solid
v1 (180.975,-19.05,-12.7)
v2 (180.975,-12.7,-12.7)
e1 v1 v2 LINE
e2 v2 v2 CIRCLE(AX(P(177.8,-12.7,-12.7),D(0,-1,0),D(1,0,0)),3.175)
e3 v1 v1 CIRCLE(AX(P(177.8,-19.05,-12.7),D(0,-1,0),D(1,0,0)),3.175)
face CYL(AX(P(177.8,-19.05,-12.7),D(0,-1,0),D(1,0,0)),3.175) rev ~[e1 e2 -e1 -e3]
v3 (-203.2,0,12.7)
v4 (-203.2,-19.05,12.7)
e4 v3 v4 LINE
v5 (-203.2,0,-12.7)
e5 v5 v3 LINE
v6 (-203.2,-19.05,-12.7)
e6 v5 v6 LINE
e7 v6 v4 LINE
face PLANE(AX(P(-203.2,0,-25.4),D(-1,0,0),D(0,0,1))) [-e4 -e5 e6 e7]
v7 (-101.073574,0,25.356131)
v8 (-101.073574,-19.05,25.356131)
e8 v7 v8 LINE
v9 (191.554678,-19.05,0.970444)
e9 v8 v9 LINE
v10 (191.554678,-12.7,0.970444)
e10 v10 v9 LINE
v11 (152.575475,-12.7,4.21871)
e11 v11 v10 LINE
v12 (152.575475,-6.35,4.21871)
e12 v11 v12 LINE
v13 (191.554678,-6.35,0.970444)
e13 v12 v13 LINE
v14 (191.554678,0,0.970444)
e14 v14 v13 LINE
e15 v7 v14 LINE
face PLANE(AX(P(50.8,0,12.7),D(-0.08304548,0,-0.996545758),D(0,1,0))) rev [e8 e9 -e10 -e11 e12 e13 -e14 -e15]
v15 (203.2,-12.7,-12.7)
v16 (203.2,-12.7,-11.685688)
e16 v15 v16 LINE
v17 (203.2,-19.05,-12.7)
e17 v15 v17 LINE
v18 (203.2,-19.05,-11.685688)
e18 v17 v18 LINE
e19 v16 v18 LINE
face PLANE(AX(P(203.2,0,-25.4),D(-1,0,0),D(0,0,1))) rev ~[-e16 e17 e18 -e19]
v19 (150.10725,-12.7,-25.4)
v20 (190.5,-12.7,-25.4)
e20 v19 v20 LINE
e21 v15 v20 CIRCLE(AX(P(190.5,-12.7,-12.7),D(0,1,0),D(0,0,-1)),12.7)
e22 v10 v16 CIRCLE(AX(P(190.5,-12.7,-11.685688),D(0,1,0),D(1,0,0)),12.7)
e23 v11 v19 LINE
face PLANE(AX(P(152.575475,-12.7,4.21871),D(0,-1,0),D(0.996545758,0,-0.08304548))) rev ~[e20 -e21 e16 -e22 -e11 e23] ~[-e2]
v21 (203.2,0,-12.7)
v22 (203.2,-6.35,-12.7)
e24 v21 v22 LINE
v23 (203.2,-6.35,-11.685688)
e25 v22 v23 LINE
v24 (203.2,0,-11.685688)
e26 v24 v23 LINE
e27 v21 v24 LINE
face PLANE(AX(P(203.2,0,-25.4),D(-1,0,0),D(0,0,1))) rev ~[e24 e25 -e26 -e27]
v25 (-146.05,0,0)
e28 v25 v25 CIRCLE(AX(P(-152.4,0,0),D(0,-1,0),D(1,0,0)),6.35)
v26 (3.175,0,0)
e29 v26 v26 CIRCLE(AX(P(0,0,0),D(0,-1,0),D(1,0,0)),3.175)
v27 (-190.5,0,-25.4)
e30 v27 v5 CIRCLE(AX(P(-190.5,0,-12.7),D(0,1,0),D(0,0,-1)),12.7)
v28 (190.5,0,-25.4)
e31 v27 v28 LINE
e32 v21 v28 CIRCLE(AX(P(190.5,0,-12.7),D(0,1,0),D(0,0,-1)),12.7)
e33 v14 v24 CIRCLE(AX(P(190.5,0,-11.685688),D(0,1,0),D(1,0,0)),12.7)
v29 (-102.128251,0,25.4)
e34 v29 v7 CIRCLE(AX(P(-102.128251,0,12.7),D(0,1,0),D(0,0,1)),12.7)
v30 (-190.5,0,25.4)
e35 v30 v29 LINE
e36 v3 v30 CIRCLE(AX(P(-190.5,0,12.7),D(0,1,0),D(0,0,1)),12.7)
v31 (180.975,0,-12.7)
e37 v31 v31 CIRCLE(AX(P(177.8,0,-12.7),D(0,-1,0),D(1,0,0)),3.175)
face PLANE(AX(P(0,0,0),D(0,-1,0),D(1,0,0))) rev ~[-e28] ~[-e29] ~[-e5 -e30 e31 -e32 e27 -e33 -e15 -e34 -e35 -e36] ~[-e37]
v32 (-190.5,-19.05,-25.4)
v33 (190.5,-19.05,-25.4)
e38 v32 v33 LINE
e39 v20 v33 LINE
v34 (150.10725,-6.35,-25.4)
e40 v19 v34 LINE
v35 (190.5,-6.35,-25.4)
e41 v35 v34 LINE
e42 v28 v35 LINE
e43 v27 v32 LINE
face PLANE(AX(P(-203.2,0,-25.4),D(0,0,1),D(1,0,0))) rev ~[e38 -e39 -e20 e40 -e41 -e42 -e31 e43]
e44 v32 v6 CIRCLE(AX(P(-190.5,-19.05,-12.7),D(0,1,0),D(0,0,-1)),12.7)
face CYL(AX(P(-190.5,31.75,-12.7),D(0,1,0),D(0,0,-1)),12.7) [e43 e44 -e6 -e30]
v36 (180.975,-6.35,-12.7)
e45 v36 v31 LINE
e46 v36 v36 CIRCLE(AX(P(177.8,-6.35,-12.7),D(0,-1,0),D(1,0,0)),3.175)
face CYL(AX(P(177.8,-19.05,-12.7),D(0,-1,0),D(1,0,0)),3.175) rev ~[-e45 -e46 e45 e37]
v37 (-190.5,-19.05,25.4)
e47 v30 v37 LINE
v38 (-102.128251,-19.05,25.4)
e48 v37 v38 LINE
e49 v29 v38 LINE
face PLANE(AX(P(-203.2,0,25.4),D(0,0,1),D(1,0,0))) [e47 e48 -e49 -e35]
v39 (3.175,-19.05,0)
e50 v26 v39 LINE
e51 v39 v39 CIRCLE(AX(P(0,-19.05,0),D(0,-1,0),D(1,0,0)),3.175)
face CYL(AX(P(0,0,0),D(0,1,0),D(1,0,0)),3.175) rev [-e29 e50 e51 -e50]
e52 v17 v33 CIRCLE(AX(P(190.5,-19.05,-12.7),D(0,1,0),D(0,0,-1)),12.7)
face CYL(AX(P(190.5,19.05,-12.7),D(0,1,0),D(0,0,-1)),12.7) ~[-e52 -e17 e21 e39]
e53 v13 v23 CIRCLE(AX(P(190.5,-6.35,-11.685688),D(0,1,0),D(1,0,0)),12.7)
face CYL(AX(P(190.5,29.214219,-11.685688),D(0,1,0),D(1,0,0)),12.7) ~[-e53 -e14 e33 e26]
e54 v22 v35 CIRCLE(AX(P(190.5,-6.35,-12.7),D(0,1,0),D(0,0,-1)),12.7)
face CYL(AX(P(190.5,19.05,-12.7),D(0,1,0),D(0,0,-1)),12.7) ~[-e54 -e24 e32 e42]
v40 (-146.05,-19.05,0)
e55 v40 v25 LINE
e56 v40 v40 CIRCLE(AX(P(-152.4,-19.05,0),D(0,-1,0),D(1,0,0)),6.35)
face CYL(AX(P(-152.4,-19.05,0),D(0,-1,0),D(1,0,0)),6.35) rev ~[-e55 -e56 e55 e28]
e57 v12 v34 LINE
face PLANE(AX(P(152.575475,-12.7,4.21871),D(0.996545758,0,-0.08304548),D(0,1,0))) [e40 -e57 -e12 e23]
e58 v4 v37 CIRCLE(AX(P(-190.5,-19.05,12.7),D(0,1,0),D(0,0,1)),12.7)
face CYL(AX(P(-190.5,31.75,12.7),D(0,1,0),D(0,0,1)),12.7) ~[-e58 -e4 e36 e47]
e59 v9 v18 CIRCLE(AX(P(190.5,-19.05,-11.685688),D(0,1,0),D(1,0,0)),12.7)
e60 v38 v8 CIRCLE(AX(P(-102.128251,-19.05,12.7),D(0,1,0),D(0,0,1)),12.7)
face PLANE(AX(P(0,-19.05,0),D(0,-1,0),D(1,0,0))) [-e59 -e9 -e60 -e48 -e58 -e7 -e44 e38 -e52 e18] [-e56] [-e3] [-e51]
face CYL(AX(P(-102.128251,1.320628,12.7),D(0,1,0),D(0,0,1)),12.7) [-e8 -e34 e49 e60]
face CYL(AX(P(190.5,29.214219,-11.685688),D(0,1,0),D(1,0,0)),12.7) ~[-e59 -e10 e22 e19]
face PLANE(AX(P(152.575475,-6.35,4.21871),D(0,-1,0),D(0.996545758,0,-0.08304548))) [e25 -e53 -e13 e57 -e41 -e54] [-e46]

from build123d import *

# Parameters (mm, degrees)
F0_W          = 406.4
F0_H          = 50.8
F0_R          = 3.175
F1_DEPTH      = 19.05
F2_SIZE2      = 25.4
F2_SIZE       = 304.8
F3_R          = 6.35
F4_DEPTH      = 19.051
F5_R          = 3.175
F6_DEPTH      = 19.051
F7_W          = 50.8
F7_H          = 6.35
F8_DEPTH      = 59.062945272
F9_W          = 6.35
F9_H          = 25.4
F10_DEPTH     = 2.54
F11_T1_DEPTH  = 82.55
F11_T3_DEPTH  = 69.85
F11_T5_DEPTH  = 69.85
F11_T7_DEPTH  = 64.7784379794
F11_T9_DEPTH  = 64.7784379794
F11_T11_DEPTH = 21.6912557533


# Not quite as in the source:
# - a fillet or chamfer that OpenCascade refuses, or shapes differently, is made with other operations: its cross-section is extruded or revolved along the edge and cut away or added


with BuildPart() as f1:
    # F0 (on Front) → F1 (new body)
    with BuildSketch(Plane.XZ):
        Rectangle(F0_W, F0_H)
        Circle(F0_R, mode=Mode.SUBTRACT)
    extrude(amount=F1_DEPTH)

    # F2
    f2_edges = [f1.edges().sort_by_distance(p)[0] for p in [
        (203.2, -9.525, 25.4),
    ]]
    f2_side = f1.faces().sort_by_distance((0, -9.525, 25.4))[0]
    chamfer(f2_edges, length=F2_SIZE, length2=F2_SIZE2, reference=f2_side)

    # F3 (on face) → F4 (cut, through all)
    with BuildSketch(Plane.XZ.offset(19.05)):
        with Locations((-152.4, 0)):
            Circle(F3_R)
    extrude(amount=-F4_DEPTH, mode=Mode.SUBTRACT)

    # F5 (on face) → F6 (cut, through all)
    with BuildSketch(Plane.XZ.offset(19.05)):
        with Locations((177.8, -12.7)):
            Circle(F5_R)
    extrude(amount=-F6_DEPTH, mode=Mode.SUBTRACT)

    # F7 (on face) → F8 (cut, through all)
    with BuildSketch(Plane(origin=(1.4013793103, 0, 16.8165517241), x_dir=(0.9965457582, 0, -0.0830454799), z_dir=(0.0830454799, 0, 0.9965457582))):
        with Locations((177.0980980754, -9.525)):
            Rectangle(F7_W, F7_H)
    extrude(amount=-F8_DEPTH, mode=Mode.SUBTRACT)

    # F9 (on face) → F10 (cut)
    with BuildSketch(Plane.YZ.offset(203.2)):
        with Locations((-9.525, -12.7)):
            Rectangle(F9_W, F9_H)
    extrude(amount=-F10_DEPTH, mode=Mode.SUBTRACT)

    # F11: fillet of radius 12.7 on 7 edges, made by hand

    # F11_s2 → F11_t1 (cut)
    with BuildSketch(Plane.XZ.offset(-31.75)):
        with BuildLine():
            ThreePointArc((-190.5, 25.4), (-199.4802561211, 21.6802561211), (-203.2, 12.7))
            Line((-203.2, 12.7), (-203.2, 25.4))
            Line((-203.2, 25.4), (-190.5, 25.4))
        make_face()
        with BuildLine():
            ThreePointArc((-190.5, -25.4), (-199.4802561211, -21.6802561211), (-203.2, -12.7))
            Line((-203.2, -12.7), (-203.2, -25.4))
            Line((-203.2, -25.4), (-190.5, -25.4))
        make_face()
    extrude(amount=F11_T1_DEPTH, mode=Mode.SUBTRACT)

    # F11_s4 → F11_t3 (cut)
    with BuildSketch(Plane.XZ.offset(-19.05)):
        with BuildLine():
            ThreePointArc((190.5, -25.4), (199.4802561211, -21.6802561211), (203.2, -12.7))
            Line((203.2, -12.7), (203.2, -25.4))
            Line((203.2, -25.4), (190.5, -25.4))
        make_face()
    extrude(amount=F11_T3_DEPTH, mode=Mode.SUBTRACT)

    # F11_s6 → F11_t5 (cut)
    with BuildSketch(Plane.XZ.offset(-31.75)):
        with BuildLine():
            ThreePointArc((203.2, -12.7), (199.4802561211, -21.6802561211), (190.5, -25.4))
            Line((190.5, -25.4), (203.2, -25.4))
            Line((203.2, -25.4), (203.2, -12.7))
        make_face()
    extrude(amount=F11_T5_DEPTH, mode=Mode.SUBTRACT)

    # F11_s8 → F11_t7 (cut)
    with BuildSketch(Plane.XZ.offset(-29.2142189897)):
        with BuildLine():
            ThreePointArc((203.2, -11.6856875959), (199.8457050415, -3.0863970858), (191.5546775941, 0.9704435338))
            Line((191.5546775941, 0.9704435338), (203.2, 0))
            Line((203.2, 0), (203.2, -11.6856875959))
        make_face()
    extrude(amount=F11_T7_DEPTH, mode=Mode.SUBTRACT)

    # F11_s10 → F11_t9 (cut)
    with BuildSketch(Plane.XZ.offset(-16.5142189897)):
        with BuildLine():
            ThreePointArc((203.2, -11.6856875959), (199.8457050415, -3.0863970858), (191.5546775941, 0.9704435338))
            Line((191.5546775941, 0.9704435338), (203.2, 0))
            Line((203.2, 0), (203.2, -11.6856875959))
        make_face()
    extrude(amount=F11_T9_DEPTH, mode=Mode.SUBTRACT)

    # F11_s12 → F11_t11 (cut)
    with BuildSketch(Plane.XZ.offset(-1.3206278767)):
        with BuildLine():
            ThreePointArc((-102.1282511507, 25.4), (-101.6004563739, 25.3890280429), (-101.0735735565, 25.3561311297))
            Line((-101.0735735565, 25.3561311297), (-101.6, 25.4))
            Line((-101.6, 25.4), (-102.1282511507, 25.4))
        make_face()
    extrude(amount=F11_T11_DEPTH, mode=Mode.SUBTRACT)


solid = f1.part
